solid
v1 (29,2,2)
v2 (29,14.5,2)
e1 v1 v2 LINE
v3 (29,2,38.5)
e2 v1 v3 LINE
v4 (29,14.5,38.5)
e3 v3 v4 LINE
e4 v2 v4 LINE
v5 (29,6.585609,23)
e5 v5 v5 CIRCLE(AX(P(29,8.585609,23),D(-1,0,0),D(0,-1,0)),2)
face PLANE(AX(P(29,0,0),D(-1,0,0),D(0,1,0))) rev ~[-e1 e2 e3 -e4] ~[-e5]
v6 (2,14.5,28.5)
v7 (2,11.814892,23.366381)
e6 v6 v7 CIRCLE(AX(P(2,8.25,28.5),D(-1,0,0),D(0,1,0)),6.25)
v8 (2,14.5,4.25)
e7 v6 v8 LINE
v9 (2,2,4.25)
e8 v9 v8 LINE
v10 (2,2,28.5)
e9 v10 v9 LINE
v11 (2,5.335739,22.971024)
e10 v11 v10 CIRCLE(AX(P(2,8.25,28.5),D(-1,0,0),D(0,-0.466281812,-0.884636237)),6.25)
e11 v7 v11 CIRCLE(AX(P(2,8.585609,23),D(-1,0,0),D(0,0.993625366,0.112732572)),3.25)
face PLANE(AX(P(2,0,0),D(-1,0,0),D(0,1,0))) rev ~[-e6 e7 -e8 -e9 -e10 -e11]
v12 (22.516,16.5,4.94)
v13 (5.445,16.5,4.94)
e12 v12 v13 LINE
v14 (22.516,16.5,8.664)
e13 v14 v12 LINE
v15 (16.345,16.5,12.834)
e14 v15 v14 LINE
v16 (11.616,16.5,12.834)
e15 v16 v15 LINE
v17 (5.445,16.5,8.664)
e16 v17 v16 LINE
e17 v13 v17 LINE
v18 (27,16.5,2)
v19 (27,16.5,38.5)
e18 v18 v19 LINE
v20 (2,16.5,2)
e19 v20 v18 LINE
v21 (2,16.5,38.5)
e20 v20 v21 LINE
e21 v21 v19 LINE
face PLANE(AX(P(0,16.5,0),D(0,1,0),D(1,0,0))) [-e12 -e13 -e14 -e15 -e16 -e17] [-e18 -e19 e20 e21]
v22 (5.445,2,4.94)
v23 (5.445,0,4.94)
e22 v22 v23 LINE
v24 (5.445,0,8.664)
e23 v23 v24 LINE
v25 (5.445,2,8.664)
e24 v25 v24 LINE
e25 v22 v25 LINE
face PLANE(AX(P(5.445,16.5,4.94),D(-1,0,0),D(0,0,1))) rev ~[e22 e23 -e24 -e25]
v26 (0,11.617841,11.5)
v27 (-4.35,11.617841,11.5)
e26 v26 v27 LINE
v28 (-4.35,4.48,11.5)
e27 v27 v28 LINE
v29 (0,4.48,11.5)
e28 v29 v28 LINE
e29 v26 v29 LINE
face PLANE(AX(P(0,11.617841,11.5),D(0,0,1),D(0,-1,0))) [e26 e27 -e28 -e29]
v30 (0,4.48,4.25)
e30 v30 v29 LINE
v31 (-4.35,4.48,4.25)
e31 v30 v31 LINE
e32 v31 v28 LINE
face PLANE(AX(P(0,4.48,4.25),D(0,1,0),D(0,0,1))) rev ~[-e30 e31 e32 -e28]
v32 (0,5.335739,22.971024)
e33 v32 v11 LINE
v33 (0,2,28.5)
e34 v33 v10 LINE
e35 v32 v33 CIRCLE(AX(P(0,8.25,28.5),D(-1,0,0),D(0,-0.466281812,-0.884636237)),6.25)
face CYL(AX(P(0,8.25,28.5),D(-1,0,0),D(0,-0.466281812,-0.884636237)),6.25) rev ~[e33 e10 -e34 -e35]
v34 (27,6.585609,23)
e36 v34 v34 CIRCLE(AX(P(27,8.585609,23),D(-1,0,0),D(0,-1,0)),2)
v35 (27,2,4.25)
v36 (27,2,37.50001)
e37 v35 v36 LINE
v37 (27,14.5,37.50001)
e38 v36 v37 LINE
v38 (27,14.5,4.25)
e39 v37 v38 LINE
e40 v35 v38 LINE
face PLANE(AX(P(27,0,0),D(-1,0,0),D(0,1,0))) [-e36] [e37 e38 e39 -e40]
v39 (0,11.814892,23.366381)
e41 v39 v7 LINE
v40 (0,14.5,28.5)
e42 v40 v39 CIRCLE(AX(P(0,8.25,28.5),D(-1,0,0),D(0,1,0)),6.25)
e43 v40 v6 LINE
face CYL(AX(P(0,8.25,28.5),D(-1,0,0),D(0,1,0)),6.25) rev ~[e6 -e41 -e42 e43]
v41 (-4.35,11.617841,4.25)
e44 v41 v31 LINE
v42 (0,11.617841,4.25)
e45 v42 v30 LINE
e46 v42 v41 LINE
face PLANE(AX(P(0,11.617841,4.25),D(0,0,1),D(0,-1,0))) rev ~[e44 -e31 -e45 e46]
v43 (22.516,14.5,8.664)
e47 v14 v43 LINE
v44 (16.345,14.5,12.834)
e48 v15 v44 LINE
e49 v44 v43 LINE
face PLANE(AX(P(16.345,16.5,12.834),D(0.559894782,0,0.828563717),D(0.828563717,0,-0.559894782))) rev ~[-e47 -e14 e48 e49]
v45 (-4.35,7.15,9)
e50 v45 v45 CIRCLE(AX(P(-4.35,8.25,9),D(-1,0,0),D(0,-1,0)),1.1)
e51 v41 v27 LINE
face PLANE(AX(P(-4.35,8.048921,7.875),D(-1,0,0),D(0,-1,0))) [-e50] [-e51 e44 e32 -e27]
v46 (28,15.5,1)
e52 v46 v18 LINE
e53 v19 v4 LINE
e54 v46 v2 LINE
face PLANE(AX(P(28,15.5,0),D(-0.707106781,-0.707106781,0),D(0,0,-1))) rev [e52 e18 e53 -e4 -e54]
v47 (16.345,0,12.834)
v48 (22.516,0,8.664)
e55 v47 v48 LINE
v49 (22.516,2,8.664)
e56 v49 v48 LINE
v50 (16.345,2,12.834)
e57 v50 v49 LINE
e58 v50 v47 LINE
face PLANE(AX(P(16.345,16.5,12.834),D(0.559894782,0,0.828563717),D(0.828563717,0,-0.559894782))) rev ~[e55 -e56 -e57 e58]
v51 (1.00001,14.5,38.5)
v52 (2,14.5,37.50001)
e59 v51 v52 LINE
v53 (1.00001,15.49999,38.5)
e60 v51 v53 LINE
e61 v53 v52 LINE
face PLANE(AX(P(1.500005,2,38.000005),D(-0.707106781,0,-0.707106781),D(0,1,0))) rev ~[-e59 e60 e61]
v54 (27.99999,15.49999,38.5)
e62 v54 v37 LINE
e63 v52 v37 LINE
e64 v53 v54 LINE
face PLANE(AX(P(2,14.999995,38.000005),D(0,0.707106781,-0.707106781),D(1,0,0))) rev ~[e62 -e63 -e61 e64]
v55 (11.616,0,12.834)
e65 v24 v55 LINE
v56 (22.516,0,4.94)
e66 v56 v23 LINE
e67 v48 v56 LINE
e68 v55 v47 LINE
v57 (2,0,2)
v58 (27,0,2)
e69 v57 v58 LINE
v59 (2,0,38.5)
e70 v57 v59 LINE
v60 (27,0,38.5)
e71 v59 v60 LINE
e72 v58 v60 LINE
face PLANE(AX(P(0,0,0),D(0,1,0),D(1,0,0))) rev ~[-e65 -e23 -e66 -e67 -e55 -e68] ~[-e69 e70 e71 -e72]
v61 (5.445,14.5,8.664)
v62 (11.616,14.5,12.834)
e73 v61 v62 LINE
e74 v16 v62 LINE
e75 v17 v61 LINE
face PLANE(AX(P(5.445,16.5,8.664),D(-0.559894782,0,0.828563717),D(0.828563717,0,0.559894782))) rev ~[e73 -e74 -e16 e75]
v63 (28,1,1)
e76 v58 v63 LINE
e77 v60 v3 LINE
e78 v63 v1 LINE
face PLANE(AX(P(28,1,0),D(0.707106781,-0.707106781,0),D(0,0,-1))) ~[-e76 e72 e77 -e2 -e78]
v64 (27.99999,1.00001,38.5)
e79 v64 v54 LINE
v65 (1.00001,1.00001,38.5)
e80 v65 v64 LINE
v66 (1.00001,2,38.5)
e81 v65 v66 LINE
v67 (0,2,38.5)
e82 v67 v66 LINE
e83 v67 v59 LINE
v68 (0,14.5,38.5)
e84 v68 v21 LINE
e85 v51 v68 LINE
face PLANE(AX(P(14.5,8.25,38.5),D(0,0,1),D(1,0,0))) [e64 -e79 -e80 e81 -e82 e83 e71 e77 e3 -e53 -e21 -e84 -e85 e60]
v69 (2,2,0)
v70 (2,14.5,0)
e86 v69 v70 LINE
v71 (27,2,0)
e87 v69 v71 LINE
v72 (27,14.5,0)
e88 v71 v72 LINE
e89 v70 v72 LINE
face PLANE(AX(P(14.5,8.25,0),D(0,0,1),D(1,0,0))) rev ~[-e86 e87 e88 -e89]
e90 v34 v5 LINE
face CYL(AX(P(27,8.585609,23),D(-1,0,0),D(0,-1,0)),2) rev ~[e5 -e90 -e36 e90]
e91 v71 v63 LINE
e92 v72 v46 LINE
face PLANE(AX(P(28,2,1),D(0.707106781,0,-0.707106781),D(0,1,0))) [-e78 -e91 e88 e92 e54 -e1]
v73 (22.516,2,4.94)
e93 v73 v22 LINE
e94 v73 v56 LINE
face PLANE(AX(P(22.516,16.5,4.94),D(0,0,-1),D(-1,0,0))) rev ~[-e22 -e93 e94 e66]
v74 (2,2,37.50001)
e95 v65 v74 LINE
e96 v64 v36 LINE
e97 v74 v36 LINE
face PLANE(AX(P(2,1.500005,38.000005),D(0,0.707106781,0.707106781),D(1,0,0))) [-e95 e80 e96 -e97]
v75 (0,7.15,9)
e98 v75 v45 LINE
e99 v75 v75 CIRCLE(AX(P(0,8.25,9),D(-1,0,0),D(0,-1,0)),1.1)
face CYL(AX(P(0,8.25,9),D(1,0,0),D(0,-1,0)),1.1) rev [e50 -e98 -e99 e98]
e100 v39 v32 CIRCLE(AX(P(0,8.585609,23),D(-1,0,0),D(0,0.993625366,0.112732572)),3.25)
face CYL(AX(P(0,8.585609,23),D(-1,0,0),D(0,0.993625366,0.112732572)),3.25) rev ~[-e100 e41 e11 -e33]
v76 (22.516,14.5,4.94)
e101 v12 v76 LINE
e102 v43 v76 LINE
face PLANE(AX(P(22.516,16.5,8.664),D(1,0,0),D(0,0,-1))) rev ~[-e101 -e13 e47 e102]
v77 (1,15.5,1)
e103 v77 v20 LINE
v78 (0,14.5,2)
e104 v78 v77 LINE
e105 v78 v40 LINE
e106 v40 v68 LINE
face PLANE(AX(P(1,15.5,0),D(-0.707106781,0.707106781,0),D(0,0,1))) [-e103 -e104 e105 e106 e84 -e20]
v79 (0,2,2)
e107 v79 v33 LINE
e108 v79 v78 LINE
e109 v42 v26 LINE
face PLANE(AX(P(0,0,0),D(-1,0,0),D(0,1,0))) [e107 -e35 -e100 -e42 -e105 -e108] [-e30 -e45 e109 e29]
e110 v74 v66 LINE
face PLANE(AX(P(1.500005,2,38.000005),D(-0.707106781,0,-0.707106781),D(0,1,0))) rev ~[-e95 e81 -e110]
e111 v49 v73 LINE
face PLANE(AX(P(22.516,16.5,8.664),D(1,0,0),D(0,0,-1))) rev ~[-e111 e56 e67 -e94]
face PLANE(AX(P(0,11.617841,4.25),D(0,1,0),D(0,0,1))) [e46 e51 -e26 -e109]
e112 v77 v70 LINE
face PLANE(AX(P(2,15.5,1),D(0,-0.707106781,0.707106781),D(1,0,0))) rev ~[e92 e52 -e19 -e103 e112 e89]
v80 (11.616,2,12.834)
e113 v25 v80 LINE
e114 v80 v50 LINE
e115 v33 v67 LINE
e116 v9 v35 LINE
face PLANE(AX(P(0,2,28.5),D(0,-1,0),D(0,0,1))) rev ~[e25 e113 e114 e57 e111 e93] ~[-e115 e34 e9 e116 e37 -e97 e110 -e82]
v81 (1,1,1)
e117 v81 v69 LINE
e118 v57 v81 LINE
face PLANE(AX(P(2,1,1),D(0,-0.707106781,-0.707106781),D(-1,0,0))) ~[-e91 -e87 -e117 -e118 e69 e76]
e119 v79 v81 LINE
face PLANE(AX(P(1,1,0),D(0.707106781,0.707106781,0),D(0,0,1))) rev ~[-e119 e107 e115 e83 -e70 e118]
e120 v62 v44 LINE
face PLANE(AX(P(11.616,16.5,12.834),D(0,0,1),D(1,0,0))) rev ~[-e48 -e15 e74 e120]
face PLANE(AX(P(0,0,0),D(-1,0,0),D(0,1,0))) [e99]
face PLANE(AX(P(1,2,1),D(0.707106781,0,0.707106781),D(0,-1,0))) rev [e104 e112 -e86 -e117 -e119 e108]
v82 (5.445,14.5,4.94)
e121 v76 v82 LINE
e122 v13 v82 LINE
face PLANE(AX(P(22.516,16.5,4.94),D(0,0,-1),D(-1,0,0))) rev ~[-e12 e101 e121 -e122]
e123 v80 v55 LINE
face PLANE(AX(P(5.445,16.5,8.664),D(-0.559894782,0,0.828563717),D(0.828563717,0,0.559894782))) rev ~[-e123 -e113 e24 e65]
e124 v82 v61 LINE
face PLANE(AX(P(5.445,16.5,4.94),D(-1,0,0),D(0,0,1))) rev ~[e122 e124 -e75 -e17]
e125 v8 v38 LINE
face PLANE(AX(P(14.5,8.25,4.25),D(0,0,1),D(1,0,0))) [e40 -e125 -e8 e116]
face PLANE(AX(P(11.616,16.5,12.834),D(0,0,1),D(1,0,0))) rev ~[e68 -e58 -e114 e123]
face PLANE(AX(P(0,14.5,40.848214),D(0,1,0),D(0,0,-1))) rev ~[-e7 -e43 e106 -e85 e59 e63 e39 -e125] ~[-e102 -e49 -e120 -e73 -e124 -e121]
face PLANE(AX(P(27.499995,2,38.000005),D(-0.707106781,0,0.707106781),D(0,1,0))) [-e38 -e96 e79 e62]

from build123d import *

# Parameters (mm, degrees)
F0_W      = 29
F0_H      = 16.5
F1_DEPTH  = 38.5
F2_T      = -2
F3_DEPTH  = 2.25
F4_SIZE   = 2
F5_SIZE   = 2
F6_SIZE   = 2
F7_SIZE   = 2
F8_SIZE   = 2
F9_SIZE   = 0.99999
F11_DEPTH = 16.501
F12_SIZE  = 2
F13_SIZE  = 2
F14_W     = 12.5
F14_H     = 2.3482141793
F15_DEPTH = 2
F16_R     = 2
F17_DEPTH = 2.001
F18_W     = 7.1378413203
F18_H     = 7.25
F18_R     = 1.1
F19_DEPTH = 4.35


# Not quite as in the source:
# - a fillet or chamfer is up to 0.001 mm smaller than in the source, because OpenCascade refuses the exact size


with BuildPart() as f1:
    # F0 (on Top) → F1 (new body)
    with BuildSketch(Plane.XY):
        with Locations((14.5, 8.25)):
            Rectangle(F0_W, F0_H)
    extrude(amount=F1_DEPTH)

    # F2
    f2_openings = [f1.faces().sort_by_distance(p)[0] for p in [
        (14.5, 8.25, 38.5),
    ]]
    offset(amount=F2_T, openings=f2_openings)

    # F3 (add): a face of the model
    f3_faces = [f1.faces().sort_by_distance(p)[0] for p in [
        (14.5, 8.25, 2),
    ]]
    extrude(f3_faces, amount=F3_DEPTH)

    # F4
    f4_edges = [f1.edges().sort_by_distance(p)[0] for p in [
        (0, 0, 19.25),
    ]]
    chamfer(f4_edges, length=F4_SIZE)

    # F5
    f5_edges = [f1.edges().sort_by_distance(p)[0] for p in [
        (0, 16.5, 19.25),
        (29, 0, 19.25),
    ]]
    chamfer(f5_edges, length=F5_SIZE)

    # F6
    f6_edges = [f1.edges().sort_by_distance(p)[0] for p in [
        (29, 16.5, 19.25),
    ]]
    chamfer(f6_edges, length=F6_SIZE)

    # F7
    f7_edges = [f1.edges().sort_by_distance(p)[0] for p in [
        (14.5, 0, 0),
    ]]
    chamfer(f7_edges, length=F7_SIZE)

    # F8
    f8_edges = [f1.edges().sort_by_distance(p)[0] for p in [
        (14.5, 16.5, 0),
    ]]
    chamfer(f8_edges, length=F8_SIZE)

    # F9 (size 1 in the source; OpenCascade refuses exactly that, so slightly less here)
    f9_edges = [f1.edges().sort_by_distance(p)[0] for p in [
        (14.5, 14.5, 38.5),
        (2, 8.25, 38.5),
        (14.5, 2, 38.5),
        (27, 8.25, 38.5),
    ]]
    chamfer(f9_edges, length=F9_SIZE)

    # F10 (on face) → F11 (cut, through all)
    with BuildSketch(Plane(origin=(0, 16.5, 0), x_dir=(-1, 0, 0), z_dir=(0, 1, 0))):
        Polygon((-16.345, 12.834), (-22.516, 8.664), (-22.516, 4.94), (-5.445, 4.94), (-5.445, 8.664), (-11.616, 12.834), align=None)
    extrude(amount=-F11_DEPTH, mode=Mode.SUBTRACT)

    # F12
    f12_edges = [f1.edges().sort_by_distance(p)[0] for p in [
        (0, 8.25, 0),
    ]]
    chamfer(f12_edges, length=F12_SIZE)

    # F13
    f13_edges = [f1.edges().sort_by_distance(p)[0] for p in [
        (29, 8.25, 0),
    ]]
    chamfer(f13_edges, length=F13_SIZE)

    # F14 (on face) → F15 (cut, through all)
    with BuildSketch(Plane(origin=(0, 0, 0), x_dir=(0, -1, 0), z_dir=(-1, 0, 0))):
        with BuildLine():
            ThreePointArc((-14.5, 28.5), (-8.25, 34.75), (-2, 28.5))
            Line((-2, 28.5), (-2, 38.5))
            Line((-2, 38.5), (-14.5, 38.5))
            Line((-14.5, 38.5), (-14.5, 28.5))
        make_face()
        with Locations((-8.25, 39.6741070896)):
            Rectangle(F14_W, F14_H)
        with BuildLine():
            Line((-14.5, 28.5), (-2, 28.5))
            ThreePointArc((-2, 28.5), (-8.25, 34.75), (-14.5, 28.5))
        make_face()
        with BuildLine():
            ThreePointArc((-11.8148919341, 23.3663808577), (-8.6306663931, 22.2616033232), (-5.335738673, 22.9710235198))
            ThreePointArc((-5.335738673, 22.9710235198), (-5.3356417901, 22.985511616), (-5.3356094956, 23))
            ThreePointArc((-5.3356094956, 23), (-8.4021264241, 26.2448164759), (-11.8148919341, 23.3663808577))
        make_face()
        with BuildLine():
            ThreePointArc((-11.8148919341, 23.3663808577), (-8.7835560201, 19.7560337281), (-5.335738673, 22.9710235198))
            ThreePointArc((-5.335738673, 22.9710235198), (-8.6306663931, 22.2616033232), (-11.8148919341, 23.3663808577))
        make_face()
        with BuildLine():
            ThreePointArc((-5.335738673, 22.9710235198), (-2.8985220129, 25.2713496081), (-2, 28.5))
            Line((-2, 28.5), (-14.5, 28.5))
            ThreePointArc((-14.5, 28.5), (-13.7881889905, 25.6032841517), (-11.8148919341, 23.3663808577))
            ThreePointArc((-11.8148919341, 23.3663808577), (-8.4021264241, 26.2448164759), (-5.3356094956, 23))
            ThreePointArc((-5.3356094956, 23), (-5.3356417901, 22.985511616), (-5.335738673, 22.9710235198))
        make_face()
    extrude(amount=-F15_DEPTH, mode=Mode.SUBTRACT)

    # F16 (on face) → F17 (cut, through all)
    with BuildSketch(Plane(origin=(27, 0, 0), x_dir=(0, -1, 0), z_dir=(-1, 0, 0))):
        with Locations((-8.5856094956, 23)):
            Circle(F16_R)
    extrude(amount=-F17_DEPTH, mode=Mode.SUBTRACT)

    # F18 (on face) → F19 (join)
    with BuildSketch(Plane(origin=(0, 0, 0), x_dir=(0, -1, 0), z_dir=(-1, 0, 0))):
        with Locations((-8.0489206601, 7.875)):
            Rectangle(F18_W, F18_H)
        with Locations((-8.25, 9)):
            Circle(F18_R, mode=Mode.SUBTRACT)
    extrude(amount=F19_DEPTH)


solid = f1.part
